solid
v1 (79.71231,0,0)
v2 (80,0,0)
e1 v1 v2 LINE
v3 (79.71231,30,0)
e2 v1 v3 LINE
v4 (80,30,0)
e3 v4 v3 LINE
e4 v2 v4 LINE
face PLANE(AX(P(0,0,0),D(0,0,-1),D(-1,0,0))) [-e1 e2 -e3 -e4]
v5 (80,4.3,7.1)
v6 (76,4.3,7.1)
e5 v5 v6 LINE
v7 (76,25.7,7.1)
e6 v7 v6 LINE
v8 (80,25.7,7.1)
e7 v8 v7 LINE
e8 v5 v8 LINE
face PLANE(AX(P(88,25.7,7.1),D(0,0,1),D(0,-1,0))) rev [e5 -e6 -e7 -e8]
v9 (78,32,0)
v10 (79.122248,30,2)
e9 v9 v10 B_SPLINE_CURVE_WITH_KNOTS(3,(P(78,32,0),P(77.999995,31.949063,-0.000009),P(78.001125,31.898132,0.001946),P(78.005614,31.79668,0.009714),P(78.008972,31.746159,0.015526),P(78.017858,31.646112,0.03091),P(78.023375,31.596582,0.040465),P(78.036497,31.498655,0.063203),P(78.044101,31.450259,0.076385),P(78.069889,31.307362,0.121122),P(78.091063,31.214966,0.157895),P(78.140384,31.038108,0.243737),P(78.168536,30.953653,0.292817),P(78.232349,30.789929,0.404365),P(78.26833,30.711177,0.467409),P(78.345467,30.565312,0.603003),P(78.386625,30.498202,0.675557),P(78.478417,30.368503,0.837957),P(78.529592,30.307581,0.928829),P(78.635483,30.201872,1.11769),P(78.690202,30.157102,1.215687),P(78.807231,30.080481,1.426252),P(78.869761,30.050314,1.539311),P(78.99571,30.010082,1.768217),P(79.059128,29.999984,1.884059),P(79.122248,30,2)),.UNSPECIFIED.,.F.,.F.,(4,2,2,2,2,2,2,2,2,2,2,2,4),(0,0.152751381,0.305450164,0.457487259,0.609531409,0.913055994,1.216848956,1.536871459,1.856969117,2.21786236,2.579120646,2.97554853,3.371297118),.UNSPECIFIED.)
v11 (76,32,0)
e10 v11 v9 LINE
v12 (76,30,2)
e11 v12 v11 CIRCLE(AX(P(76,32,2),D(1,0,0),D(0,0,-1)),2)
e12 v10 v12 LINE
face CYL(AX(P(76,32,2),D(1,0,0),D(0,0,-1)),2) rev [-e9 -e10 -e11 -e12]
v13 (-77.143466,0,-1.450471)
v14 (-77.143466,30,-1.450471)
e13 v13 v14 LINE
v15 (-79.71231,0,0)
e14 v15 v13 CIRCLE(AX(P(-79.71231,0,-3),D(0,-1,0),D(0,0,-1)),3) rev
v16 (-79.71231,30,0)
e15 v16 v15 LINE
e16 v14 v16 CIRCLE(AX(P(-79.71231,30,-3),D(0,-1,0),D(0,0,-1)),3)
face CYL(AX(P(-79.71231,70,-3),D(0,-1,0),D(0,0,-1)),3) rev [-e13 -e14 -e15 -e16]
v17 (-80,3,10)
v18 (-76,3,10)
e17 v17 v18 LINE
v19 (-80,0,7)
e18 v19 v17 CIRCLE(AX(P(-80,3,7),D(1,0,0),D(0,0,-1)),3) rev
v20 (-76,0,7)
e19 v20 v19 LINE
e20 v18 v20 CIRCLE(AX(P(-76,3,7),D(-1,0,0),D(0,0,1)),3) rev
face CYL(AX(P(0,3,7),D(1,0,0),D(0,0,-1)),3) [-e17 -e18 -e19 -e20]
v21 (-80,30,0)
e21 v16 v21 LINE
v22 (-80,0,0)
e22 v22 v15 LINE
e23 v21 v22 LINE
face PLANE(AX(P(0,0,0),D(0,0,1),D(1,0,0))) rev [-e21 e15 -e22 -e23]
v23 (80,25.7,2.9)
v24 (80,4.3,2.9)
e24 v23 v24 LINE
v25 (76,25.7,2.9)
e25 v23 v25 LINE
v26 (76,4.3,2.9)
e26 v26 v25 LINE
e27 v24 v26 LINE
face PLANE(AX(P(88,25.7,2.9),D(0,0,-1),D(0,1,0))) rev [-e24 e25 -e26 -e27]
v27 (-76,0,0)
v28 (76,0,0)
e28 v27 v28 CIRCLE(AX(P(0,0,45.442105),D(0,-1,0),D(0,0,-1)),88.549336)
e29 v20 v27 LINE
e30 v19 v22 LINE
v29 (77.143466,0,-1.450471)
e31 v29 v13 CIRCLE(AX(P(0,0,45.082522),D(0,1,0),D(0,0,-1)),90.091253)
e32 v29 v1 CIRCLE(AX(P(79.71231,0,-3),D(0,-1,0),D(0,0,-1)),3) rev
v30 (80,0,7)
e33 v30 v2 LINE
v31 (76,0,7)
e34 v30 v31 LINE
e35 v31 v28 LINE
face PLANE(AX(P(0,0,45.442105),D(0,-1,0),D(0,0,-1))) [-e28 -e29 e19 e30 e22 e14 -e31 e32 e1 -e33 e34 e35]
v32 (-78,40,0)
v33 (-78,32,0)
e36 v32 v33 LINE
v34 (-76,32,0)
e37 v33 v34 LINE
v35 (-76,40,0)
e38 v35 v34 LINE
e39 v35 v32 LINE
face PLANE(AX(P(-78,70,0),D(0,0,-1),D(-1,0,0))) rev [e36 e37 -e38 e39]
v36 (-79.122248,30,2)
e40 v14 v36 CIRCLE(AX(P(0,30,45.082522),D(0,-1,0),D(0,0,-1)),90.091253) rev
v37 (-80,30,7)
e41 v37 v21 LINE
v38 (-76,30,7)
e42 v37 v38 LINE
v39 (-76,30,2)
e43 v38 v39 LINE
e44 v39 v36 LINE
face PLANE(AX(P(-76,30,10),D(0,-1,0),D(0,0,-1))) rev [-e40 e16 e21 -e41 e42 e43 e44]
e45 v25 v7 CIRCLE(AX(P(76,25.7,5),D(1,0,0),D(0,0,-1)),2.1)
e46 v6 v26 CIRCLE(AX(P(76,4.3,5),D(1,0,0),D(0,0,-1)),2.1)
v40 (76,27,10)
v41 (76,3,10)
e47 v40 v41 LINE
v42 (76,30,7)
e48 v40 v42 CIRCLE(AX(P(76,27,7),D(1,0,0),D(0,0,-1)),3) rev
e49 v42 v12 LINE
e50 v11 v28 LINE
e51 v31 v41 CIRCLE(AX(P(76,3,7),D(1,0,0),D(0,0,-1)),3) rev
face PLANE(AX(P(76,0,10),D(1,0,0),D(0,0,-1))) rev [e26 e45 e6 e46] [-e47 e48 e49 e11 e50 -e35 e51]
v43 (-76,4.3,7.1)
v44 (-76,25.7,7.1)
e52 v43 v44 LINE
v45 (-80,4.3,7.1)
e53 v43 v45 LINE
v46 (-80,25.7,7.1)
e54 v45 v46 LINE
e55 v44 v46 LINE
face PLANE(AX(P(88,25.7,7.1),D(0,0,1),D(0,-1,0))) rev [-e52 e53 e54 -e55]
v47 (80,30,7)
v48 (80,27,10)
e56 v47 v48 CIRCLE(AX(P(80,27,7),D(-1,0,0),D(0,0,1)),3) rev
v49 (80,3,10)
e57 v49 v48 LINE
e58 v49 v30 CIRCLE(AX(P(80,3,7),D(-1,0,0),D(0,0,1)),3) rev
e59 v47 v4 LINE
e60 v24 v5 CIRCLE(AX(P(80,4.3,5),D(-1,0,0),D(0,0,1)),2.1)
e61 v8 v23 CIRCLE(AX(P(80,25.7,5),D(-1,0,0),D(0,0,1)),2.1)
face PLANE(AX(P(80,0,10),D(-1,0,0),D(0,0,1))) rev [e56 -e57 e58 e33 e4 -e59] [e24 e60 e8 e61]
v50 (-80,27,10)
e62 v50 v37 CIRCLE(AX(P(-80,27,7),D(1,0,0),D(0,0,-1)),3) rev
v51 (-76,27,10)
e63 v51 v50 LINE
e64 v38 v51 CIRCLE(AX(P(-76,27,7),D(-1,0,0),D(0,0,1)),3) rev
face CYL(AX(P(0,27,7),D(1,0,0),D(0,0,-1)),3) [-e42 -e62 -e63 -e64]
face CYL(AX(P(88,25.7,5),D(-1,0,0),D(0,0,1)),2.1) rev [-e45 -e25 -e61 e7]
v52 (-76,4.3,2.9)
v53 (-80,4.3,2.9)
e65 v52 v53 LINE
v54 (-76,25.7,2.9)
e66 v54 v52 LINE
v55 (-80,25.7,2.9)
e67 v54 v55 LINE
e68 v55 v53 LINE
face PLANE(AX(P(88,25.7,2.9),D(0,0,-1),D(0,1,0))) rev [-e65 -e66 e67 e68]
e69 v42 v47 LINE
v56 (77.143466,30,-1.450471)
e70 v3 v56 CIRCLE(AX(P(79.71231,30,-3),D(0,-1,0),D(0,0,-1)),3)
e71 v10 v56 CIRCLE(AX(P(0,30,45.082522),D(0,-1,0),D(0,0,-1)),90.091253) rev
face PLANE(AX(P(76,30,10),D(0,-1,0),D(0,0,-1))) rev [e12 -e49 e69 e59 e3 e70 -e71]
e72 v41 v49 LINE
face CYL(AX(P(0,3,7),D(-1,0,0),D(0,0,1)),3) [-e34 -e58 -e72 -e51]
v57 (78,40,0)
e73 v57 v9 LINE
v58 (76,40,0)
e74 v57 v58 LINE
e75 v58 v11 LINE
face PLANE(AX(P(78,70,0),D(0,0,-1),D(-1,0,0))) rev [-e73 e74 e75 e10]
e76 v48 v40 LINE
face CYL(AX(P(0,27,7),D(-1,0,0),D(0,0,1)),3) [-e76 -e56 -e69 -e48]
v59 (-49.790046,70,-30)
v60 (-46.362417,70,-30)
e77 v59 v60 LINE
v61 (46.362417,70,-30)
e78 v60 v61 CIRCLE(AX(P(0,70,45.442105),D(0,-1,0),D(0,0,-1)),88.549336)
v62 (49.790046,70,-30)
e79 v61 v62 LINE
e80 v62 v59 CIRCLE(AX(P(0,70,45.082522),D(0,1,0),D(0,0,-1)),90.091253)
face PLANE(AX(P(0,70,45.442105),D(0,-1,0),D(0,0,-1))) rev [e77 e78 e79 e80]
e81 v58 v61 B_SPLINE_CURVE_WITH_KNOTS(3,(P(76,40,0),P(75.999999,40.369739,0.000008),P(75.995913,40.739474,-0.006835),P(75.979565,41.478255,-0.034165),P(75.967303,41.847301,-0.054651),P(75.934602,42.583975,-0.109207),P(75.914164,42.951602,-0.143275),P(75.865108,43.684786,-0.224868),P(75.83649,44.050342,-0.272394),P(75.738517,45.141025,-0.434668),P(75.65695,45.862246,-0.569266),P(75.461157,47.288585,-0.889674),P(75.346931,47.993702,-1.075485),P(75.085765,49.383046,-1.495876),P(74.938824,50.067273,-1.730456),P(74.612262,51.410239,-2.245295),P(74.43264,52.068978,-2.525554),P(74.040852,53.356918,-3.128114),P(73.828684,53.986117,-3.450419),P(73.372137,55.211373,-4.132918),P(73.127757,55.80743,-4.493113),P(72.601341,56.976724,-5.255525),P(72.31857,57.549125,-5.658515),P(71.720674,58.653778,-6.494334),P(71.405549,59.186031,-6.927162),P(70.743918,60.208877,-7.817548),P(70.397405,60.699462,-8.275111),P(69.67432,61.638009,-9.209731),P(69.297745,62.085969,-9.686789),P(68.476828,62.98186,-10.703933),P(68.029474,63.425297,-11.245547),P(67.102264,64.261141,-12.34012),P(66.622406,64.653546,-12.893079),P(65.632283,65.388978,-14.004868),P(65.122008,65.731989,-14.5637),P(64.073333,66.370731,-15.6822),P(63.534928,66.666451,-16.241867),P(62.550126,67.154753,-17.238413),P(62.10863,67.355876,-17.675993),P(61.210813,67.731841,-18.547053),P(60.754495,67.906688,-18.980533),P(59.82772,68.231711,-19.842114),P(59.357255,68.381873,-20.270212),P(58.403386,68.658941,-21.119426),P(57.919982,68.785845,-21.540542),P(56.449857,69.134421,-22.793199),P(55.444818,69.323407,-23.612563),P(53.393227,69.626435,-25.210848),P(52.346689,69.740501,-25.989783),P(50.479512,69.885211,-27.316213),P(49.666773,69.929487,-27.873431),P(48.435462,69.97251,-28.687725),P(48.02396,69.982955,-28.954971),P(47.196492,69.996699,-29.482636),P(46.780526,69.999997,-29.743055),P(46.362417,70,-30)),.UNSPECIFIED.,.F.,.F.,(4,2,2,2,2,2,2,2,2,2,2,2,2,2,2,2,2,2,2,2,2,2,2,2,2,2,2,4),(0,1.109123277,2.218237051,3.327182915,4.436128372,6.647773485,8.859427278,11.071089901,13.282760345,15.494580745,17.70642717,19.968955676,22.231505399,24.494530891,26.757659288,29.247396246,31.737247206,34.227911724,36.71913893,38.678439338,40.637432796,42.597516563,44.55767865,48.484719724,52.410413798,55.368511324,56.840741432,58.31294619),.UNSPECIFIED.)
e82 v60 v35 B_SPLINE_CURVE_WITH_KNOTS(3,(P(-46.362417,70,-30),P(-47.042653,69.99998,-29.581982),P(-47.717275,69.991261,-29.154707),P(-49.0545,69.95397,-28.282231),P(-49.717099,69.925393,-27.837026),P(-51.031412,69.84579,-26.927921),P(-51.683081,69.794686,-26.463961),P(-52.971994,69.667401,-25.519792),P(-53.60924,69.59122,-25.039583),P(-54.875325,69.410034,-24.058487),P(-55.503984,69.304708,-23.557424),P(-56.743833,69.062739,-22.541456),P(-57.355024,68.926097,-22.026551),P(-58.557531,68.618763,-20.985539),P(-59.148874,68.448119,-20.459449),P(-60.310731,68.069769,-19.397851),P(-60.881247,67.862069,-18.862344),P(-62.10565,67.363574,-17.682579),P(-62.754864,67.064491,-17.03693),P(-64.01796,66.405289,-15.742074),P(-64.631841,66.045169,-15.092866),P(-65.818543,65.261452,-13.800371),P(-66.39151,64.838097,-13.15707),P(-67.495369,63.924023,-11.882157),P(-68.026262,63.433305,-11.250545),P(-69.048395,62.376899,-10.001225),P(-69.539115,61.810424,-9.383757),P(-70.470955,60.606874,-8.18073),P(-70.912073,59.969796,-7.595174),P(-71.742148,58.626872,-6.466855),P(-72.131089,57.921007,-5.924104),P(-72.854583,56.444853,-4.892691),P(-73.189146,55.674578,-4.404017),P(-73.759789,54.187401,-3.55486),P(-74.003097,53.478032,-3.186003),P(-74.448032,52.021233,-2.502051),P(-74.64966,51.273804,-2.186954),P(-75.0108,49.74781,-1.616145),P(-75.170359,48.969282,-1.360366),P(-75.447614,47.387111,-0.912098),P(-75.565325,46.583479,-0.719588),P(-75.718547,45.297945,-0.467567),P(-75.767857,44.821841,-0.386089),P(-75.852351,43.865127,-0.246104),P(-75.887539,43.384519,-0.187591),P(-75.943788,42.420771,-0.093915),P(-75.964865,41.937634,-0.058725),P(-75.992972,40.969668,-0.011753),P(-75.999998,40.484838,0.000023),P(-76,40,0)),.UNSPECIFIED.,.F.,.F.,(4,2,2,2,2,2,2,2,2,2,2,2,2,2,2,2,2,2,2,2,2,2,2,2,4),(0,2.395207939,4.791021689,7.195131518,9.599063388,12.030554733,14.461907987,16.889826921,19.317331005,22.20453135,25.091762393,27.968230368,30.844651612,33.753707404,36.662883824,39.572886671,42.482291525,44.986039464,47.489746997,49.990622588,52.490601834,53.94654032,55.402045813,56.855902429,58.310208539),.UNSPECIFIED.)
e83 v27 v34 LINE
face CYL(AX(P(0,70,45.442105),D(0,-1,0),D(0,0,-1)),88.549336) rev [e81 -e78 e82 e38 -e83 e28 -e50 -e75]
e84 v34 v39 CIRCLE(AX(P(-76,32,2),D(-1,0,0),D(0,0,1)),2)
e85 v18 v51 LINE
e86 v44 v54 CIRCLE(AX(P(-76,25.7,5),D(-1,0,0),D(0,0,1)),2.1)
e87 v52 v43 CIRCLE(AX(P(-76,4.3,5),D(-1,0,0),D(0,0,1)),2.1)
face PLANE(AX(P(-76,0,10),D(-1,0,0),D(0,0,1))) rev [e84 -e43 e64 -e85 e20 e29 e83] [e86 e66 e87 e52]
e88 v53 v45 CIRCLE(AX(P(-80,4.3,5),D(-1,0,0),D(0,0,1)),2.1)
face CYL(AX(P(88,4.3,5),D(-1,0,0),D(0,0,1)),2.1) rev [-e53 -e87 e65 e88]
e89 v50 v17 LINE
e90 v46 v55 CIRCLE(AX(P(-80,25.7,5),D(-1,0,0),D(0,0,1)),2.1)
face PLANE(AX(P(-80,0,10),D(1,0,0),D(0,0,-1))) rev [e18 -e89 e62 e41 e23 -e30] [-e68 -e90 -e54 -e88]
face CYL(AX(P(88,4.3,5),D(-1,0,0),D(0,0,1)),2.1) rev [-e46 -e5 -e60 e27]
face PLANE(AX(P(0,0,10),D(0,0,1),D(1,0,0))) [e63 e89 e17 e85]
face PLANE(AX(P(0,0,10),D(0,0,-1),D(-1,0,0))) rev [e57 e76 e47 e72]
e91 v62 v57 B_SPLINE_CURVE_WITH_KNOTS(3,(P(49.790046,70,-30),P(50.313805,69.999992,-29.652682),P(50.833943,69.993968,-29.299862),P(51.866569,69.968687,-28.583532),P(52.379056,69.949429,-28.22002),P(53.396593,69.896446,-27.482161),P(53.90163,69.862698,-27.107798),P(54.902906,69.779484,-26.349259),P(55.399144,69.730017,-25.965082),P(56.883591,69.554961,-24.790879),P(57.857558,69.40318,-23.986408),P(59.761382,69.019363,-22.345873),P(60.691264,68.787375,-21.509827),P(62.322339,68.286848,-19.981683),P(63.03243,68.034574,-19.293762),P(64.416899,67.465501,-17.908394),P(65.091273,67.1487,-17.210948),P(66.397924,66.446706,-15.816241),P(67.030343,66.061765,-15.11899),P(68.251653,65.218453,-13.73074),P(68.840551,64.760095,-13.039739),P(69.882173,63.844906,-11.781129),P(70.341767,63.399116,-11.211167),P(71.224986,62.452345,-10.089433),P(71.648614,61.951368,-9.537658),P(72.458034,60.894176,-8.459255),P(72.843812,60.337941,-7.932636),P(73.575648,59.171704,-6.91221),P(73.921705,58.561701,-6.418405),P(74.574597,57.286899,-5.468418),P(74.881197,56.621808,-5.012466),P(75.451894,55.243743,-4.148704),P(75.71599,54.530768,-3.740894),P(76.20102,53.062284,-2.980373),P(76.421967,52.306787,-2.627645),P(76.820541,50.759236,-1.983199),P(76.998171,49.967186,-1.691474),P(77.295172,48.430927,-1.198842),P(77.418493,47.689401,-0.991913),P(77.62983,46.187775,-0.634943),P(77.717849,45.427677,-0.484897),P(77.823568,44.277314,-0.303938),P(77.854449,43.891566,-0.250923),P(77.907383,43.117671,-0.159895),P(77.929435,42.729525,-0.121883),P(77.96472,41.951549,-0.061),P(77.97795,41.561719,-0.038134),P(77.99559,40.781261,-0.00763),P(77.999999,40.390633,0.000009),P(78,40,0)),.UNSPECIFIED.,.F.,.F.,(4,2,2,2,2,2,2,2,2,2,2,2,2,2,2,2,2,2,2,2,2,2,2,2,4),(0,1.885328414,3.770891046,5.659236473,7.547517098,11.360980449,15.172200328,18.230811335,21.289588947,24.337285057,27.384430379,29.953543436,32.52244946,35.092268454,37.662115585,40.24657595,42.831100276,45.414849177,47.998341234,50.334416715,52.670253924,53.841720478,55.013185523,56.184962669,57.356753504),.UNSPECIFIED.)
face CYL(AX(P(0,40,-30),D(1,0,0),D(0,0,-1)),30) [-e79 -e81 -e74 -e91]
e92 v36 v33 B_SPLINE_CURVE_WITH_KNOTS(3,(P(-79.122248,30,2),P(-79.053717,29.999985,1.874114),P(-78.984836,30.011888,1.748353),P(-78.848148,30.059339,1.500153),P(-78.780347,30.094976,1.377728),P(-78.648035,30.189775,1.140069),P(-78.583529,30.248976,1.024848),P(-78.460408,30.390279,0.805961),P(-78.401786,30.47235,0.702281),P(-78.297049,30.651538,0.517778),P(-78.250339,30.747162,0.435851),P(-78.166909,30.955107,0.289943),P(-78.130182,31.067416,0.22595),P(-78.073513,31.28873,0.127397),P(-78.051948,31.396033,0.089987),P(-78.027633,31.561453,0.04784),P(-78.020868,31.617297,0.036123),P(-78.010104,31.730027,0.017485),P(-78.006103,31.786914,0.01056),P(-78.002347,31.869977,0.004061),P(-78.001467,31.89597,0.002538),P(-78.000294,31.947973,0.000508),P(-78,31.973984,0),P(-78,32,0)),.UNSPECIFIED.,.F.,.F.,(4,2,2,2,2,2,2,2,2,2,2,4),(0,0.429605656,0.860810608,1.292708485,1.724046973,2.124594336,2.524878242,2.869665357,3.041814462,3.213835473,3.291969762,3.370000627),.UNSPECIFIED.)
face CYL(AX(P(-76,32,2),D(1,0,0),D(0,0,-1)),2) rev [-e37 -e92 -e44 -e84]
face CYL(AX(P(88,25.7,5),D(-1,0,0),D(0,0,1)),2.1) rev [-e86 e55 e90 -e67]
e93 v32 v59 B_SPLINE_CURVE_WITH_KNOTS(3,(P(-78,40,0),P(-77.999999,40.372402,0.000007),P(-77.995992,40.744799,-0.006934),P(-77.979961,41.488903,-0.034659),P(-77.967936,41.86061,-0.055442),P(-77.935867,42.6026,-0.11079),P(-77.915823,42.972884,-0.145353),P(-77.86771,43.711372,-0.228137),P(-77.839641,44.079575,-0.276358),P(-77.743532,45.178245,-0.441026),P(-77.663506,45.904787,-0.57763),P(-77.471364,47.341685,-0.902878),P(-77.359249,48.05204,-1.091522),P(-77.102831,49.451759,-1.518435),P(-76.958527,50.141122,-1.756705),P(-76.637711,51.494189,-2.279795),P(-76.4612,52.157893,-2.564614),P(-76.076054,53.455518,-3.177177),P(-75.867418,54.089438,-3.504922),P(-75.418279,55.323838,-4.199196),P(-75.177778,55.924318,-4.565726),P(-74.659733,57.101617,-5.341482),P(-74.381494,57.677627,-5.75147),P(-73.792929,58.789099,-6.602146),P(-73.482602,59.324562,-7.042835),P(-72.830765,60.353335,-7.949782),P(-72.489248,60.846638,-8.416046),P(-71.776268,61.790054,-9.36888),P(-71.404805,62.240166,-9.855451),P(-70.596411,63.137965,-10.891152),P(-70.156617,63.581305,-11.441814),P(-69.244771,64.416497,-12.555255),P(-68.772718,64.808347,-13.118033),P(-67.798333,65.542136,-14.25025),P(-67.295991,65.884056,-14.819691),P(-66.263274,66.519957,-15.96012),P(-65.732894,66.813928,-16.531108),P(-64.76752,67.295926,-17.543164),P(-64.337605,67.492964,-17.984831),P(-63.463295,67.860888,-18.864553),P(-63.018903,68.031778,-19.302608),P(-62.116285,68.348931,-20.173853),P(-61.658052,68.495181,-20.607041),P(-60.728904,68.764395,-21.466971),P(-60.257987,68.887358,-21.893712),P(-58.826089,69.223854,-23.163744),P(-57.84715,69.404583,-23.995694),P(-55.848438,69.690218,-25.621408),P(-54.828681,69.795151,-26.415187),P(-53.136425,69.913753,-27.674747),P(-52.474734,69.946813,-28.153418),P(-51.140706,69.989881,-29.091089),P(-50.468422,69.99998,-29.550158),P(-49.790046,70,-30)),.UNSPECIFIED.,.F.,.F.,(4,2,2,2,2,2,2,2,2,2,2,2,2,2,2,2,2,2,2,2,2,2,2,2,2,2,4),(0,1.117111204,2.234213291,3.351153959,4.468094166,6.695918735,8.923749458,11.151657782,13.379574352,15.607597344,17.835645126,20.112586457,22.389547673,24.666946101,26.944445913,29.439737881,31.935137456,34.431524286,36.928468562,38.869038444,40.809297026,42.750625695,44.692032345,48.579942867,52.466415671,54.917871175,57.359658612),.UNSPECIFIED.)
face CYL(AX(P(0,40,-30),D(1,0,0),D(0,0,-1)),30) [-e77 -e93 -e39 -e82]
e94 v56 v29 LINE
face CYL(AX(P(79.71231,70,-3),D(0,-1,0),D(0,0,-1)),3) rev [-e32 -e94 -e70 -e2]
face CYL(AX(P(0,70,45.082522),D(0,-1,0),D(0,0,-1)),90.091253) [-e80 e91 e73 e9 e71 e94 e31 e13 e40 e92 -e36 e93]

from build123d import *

# Parameters (mm, degrees)
BOSS_EXTRUDE1_DEPTH = 70
SKETCH3_W           = 4
SKETCH3_H           = 30
BOSS_EXTRUDE2_DEPTH = 10
CUT_EXTRUDE1_DEPTH  = 168
FILLET2_R           = 3
FILLET3_R           = 2
FILLET4_R           = 30


with BuildPart() as part:
    # Sketch1 → Boss-Extrude1 (new body)
    with BuildSketch(Plane(origin=(0, 0, 0), x_dir=(1, 0, 0), z_dir=(0, 1, 0))):
        with BuildLine():
            Line((-78, 0), (-76, 0))
            ThreePointArc((-76, 0), (0, 43.107230832), (76, 0))
            Line((76, 0), (78, 0))
            ThreePointArc((78, 0), (0, 45.008730356), (-78, 0))
        make_face()
    extrude(amount=BOSS_EXTRUDE1_DEPTH)

    # Sketch3 → Boss-Extrude2 (add)
    with BuildSketch(Plane.XY):
        with Locations((-78, 15)):
            Rectangle(SKETCH3_W, SKETCH3_H)
        with Locations((78, 15)):
            Rectangle(SKETCH3_W, SKETCH3_H)
    extrude(amount=BOSS_EXTRUDE2_DEPTH)

    # Sketch4 → Cut-Extrude1 (cut)
    with BuildSketch(Plane.ZY.offset(80)):
        with BuildLine():
            Line((7.1, 25.7), (7.1, 4.3))
            ThreePointArc((7.1, 4.3), (5, 2.2), (2.9, 4.3))
            Line((2.9, 4.3), (2.9, 25.7))
            ThreePointArc((2.9, 25.7), (5, 27.8), (7.1, 25.7))
        make_face()
    extrude(amount=-CUT_EXTRUDE1_DEPTH, mode=Mode.SUBTRACT)

    # Fillet2
    fillet2_edges = [part.edges().sort_by_distance(p)[0] for p in [
        (-78, 15, 0),
        (-78, 30, 10),
        (-78, 0, 10),
        (78, 0, 10),
        (78, 30, 10),
        (78, 15, 0),
    ]]
    fillet(fillet2_edges, radius=FILLET2_R)

    # Fillet3
    fillet3_edges = [part.edges().sort_by_distance(p)[0] for p in [
        (-77, 30, 0),
        (77, 30, 0),
    ]]
    fillet(fillet3_edges, radius=FILLET3_R)

    # Fillet4
    # the kernel refuses this fillet: 30 mm, written as the material it takes off along each edge
    with BuildSketch(Plane(origin=(-153, 70, 0), x_dir=(0, 0, -1), z_dir=(1, 0, 0))) as fillet4_piece_1:
        with BuildLine():
            CenterArc((FILLET4_R, -FILLET4_R), FILLET4_R, 90, 90)
            Line((0, -FILLET4_R), (0, 0))
            Line((0, 0), (FILLET4_R, 0))
        make_face()
    extrude(amount=152, mode=Mode.SUBTRACT)
    with BuildSketch(Plane(origin=(1, 70, 0), x_dir=(0, -1, 0), z_dir=(1, 0, 0))) as fillet4_piece_2:
        with BuildLine():
            CenterArc((FILLET4_R, FILLET4_R), FILLET4_R, 180, 90)
            Line((0, FILLET4_R), (0, 0))
            Line((0, 0), (FILLET4_R, 0))
        make_face()
    extrude(amount=152, mode=Mode.SUBTRACT)


solid = part.part
